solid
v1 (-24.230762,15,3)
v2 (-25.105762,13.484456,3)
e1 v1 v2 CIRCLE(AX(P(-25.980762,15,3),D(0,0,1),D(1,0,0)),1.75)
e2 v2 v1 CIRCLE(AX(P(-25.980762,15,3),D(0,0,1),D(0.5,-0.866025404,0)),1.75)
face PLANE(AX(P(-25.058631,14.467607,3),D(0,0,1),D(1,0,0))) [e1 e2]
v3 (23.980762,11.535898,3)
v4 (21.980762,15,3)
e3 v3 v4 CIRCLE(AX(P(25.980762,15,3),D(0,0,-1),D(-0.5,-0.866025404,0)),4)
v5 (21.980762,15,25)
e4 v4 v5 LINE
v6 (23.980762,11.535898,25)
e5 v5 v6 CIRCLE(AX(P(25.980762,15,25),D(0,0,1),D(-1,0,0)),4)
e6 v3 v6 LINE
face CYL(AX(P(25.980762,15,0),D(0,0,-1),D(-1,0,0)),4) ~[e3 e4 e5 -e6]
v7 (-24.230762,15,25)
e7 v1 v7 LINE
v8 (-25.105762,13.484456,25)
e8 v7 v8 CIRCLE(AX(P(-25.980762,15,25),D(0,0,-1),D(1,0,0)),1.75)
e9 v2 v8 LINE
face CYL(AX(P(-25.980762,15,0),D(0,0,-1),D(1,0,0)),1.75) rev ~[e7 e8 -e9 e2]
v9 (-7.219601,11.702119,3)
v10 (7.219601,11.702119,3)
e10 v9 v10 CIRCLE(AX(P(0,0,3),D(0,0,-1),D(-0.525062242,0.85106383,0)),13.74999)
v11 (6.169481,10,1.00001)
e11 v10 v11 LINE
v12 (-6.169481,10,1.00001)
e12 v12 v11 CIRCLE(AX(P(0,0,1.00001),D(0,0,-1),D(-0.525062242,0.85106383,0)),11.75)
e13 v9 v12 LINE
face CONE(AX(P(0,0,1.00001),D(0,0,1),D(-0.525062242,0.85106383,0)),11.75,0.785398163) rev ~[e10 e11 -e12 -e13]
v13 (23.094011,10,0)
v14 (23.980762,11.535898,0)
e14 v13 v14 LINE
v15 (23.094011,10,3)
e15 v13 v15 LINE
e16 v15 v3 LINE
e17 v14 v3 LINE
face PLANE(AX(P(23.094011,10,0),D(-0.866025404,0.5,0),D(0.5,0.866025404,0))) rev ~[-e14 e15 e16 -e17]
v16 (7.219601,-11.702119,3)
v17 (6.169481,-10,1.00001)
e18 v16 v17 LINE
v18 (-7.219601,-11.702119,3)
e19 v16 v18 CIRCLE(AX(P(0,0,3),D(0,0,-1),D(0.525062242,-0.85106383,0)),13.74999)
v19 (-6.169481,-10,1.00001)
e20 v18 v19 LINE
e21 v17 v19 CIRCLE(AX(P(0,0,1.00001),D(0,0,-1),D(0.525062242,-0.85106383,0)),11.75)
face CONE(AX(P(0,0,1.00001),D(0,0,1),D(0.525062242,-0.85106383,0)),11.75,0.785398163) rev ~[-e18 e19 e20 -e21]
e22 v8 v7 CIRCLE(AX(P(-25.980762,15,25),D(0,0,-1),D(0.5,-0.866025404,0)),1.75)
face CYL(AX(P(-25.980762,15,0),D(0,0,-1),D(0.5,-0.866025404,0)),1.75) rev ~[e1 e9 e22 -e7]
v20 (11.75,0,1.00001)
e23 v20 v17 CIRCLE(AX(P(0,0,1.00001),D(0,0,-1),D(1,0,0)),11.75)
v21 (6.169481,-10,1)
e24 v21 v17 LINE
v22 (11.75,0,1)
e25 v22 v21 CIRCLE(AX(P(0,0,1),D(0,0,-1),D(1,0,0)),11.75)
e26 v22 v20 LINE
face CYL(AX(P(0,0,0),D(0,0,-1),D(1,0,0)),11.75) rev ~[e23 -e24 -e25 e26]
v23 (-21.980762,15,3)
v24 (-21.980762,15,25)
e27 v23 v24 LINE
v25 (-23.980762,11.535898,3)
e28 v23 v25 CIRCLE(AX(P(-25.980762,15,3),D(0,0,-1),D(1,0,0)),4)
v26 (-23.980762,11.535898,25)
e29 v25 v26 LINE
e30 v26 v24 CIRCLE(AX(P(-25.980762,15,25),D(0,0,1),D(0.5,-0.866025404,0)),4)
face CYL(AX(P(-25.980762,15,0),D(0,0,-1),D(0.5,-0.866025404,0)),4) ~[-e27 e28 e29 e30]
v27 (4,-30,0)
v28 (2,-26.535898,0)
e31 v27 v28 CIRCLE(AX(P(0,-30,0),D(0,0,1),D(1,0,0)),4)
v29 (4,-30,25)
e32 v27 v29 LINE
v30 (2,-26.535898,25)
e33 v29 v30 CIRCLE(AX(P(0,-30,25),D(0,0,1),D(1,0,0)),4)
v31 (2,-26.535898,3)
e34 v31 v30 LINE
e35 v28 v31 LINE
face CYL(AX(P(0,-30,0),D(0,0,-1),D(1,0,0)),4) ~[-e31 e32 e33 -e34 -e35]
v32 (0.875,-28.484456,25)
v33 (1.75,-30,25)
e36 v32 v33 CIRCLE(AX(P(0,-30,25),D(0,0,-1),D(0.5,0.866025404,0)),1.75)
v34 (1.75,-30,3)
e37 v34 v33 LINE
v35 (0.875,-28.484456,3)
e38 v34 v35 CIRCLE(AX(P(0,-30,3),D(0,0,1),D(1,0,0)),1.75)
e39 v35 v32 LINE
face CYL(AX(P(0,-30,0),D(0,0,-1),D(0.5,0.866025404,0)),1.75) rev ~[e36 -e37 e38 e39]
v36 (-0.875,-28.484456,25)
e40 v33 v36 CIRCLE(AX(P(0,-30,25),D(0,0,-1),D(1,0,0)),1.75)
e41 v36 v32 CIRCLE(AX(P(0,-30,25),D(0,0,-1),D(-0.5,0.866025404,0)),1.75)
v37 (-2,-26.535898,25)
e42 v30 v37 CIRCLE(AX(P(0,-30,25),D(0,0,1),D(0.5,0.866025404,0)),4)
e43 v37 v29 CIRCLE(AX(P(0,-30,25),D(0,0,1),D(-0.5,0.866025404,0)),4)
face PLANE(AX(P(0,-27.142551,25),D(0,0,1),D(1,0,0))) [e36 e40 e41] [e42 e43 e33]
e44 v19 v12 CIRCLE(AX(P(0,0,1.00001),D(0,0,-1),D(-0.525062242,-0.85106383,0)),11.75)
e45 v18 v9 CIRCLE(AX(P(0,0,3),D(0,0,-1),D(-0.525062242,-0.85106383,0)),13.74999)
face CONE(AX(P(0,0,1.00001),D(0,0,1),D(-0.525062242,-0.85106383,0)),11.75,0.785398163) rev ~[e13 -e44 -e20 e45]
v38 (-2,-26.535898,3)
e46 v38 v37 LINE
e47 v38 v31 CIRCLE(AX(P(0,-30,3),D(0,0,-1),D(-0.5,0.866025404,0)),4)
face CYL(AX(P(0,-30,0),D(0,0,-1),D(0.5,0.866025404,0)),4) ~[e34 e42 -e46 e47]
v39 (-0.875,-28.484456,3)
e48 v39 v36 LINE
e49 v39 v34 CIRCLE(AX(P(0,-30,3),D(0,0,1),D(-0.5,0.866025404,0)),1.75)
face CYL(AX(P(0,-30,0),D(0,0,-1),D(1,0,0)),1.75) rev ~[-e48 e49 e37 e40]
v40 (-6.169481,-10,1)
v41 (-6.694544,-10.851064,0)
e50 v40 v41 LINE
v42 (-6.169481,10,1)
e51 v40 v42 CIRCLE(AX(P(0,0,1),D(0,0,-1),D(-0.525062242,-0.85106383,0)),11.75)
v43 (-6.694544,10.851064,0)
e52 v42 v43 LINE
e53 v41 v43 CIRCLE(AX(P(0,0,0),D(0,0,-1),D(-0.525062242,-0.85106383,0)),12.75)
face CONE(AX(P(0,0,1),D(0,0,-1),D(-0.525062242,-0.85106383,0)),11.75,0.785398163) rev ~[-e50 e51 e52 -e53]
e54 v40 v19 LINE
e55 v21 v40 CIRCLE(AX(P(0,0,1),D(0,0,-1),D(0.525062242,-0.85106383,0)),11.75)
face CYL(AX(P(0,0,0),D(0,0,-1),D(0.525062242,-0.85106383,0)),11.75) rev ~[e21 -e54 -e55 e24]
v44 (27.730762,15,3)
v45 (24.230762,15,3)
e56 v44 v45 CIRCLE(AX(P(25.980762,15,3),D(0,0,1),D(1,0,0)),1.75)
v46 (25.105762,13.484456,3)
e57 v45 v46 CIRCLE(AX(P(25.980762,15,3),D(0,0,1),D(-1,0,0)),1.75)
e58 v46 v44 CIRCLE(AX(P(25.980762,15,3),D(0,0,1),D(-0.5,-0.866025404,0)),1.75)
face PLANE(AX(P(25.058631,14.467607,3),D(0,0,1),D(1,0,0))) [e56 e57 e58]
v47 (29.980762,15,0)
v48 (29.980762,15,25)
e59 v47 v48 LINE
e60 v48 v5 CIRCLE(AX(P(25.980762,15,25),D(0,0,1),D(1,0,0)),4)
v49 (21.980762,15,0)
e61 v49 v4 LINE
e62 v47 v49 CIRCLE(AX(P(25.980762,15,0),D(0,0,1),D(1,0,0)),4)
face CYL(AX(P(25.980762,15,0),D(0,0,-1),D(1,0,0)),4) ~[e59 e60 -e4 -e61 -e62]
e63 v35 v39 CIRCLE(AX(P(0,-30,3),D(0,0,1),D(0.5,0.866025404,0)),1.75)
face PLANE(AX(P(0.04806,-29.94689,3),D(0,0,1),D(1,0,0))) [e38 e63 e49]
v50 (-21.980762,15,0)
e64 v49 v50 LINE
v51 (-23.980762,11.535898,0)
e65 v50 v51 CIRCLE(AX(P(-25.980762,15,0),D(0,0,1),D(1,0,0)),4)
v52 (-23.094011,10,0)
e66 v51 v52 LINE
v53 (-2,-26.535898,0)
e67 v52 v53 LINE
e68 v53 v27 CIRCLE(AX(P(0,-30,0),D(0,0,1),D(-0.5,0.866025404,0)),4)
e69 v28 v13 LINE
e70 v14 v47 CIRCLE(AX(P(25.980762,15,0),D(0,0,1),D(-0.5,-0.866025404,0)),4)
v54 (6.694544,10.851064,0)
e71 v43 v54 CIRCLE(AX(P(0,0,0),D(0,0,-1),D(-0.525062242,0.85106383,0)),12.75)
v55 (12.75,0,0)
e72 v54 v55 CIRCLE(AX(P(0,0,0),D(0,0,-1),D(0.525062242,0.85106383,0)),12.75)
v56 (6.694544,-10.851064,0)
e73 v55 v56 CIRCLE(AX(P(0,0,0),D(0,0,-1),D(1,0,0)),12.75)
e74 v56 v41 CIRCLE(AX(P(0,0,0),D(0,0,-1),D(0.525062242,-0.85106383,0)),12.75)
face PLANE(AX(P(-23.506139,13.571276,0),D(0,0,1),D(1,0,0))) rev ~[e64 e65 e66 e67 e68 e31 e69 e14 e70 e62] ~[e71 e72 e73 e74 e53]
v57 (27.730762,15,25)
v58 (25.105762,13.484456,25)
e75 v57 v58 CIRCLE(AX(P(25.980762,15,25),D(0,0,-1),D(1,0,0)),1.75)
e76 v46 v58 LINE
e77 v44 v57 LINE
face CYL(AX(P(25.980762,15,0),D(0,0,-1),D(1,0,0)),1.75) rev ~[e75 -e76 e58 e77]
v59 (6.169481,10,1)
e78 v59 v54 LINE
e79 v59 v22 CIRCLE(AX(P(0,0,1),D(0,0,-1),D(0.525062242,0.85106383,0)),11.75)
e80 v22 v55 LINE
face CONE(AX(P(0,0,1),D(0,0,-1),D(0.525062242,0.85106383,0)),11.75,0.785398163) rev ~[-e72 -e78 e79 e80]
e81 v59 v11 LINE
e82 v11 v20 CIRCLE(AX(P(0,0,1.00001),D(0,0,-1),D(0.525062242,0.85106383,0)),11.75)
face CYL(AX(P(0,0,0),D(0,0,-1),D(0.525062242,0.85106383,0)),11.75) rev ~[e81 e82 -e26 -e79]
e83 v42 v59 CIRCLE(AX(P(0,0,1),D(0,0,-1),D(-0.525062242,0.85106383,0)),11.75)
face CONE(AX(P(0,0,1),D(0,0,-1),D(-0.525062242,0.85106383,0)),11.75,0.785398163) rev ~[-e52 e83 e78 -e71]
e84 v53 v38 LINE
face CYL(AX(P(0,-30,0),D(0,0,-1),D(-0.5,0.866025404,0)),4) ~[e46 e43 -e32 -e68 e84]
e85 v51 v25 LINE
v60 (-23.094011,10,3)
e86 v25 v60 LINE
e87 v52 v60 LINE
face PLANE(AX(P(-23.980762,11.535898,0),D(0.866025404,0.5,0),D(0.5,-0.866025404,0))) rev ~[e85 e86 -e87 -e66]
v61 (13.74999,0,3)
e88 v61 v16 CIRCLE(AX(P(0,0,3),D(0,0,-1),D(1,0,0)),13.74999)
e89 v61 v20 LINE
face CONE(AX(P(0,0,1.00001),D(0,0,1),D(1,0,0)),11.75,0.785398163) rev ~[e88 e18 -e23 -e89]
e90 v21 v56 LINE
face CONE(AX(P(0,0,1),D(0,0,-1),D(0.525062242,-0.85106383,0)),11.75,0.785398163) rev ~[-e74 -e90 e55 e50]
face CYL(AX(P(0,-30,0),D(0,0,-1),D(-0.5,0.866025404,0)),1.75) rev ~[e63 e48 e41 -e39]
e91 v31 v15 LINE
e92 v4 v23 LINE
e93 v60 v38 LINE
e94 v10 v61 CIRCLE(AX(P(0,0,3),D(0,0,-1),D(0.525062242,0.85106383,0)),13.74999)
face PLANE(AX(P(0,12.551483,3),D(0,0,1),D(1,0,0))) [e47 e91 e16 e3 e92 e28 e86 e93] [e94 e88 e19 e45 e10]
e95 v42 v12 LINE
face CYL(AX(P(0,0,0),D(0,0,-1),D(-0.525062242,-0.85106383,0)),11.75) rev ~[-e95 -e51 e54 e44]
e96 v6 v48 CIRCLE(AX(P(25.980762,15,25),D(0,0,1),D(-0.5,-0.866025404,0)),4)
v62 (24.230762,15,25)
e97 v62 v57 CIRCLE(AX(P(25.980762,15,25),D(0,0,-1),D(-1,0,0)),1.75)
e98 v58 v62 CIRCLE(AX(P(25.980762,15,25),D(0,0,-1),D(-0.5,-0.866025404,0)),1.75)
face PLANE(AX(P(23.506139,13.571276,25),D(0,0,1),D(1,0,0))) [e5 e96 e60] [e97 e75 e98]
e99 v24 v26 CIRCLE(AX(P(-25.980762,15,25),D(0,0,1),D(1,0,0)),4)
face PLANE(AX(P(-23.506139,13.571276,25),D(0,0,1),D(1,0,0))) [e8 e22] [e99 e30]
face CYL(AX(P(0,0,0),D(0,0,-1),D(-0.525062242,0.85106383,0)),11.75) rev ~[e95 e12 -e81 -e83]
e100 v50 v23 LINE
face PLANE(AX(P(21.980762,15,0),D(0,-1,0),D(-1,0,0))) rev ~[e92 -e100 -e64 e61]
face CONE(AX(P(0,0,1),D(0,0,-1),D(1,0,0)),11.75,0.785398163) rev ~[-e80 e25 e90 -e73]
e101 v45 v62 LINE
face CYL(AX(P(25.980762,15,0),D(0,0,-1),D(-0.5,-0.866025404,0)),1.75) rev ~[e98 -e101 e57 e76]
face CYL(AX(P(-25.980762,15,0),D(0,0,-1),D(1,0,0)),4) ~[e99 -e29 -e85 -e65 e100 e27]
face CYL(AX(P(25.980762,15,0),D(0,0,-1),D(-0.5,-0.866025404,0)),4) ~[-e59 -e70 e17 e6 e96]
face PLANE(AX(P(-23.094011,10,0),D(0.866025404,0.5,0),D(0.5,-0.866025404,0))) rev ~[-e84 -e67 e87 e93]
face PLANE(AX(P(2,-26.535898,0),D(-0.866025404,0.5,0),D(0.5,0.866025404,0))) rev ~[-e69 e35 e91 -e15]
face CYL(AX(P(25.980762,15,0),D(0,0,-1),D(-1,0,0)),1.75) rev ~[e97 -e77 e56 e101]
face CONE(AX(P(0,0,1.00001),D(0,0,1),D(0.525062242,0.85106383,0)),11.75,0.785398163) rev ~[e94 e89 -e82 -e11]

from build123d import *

# Parameters (mm, degrees)
F1_DEPTH = 3
F2_DEPTH = 25
F3_SIZE  = 1
F4_SIZE  = 1.99999


# Not quite as in the source:
# - a fillet or chamfer is up to 0.001 mm smaller than in the source, because OpenCascade refuses the exact size


with BuildPart() as f1:
    # F0 (on Top) → F1 (new body)
    with BuildSketch(Plane.XY):
        with BuildLine():
            ThreePointArc((-6.1694813396, 10), (0, 11.75), (6.1694813396, 10))
            Line((6.1694813396, 10), (23.0940107676, 10))
            Line((23.0940107676, 10), (23.9807621135, 11.5358983849))
            ThreePointArc((23.9807621135, 11.5358983849), (22.5166604984, 13), (21.9807621135, 15))
            Line((21.9807621135, 15), (-21.9807621135, 15))
            ThreePointArc((-21.9807621135, 15), (-22.5166604984, 13), (-23.9807621135, 11.5358983849))
            Line((-23.9807621135, 11.5358983849), (-23.0940107676, 10))
            Line((-23.0940107676, 10), (-6.1694813396, 10))
        make_face()
        with BuildLine():
            ThreePointArc((-6.1694813396, -10), (-11.75, 0), (-6.1694813396, 10))
            Line((-6.1694813396, 10), (-23.0940107676, 10))
            Line((-23.0940107676, 10), (-11.5470053838, -10))
            Line((-11.5470053838, -10), (-6.1694813396, -10))
        make_face()
        with BuildLine():
            Line((11.5470053838, -10), (6.1694813396, -10))
            ThreePointArc((6.1694813396, -10), (0, -11.75), (-6.1694813396, -10))
            Line((-6.1694813396, -10), (-11.5470053838, -10))
            Line((-11.5470053838, -10), (-2, -26.5358983849))
            ThreePointArc((-2, -26.5358983849), (0, -26), (2, -26.5358983849))
            Line((2, -26.5358983849), (11.5470053838, -10))
        make_face()
        with BuildLine():
            ThreePointArc((6.1694813396, 10), (10.2604557828, 5.725866496), (11.75, 0))
            ThreePointArc((11.75, 0), (10.2604557828, -5.725866496), (6.1694813396, -10))
            Line((6.1694813396, -10), (11.5470053838, -10))
            Line((11.5470053838, -10), (23.0940107676, 10))
            Line((23.0940107676, 10), (6.1694813396, 10))
        make_face()
    extrude(amount=F1_DEPTH)



with BuildPart() as f1b:
    # F0 (on Top) → F1, piece 2 (new body)
    with BuildSketch(Plane.XY):
        with BuildLine():
            ThreePointArc((1.75, -30), (1.5155444566, -29.125), (0.875, -28.4844555434))
            Line((0.875, -28.4844555434), (0, -30))
            Line((0, -30), (-0.875, -28.4844555434))
            ThreePointArc((-0.875, -28.4844555434), (-0.875, -31.5155444566), (1.75, -30))
        make_face()
        with BuildLine():
            Line((0, -30), (0.875, -28.4844555434))
            ThreePointArc((0.875, -28.4844555434), (0, -28.25), (-0.875, -28.4844555434))
            Line((-0.875, -28.4844555434), (0, -30))
        make_face()
    extrude(amount=F1_DEPTH)


with BuildPart() as f1c:
    # F0 (on Top) → F1, piece 3 (new body)
    with BuildSketch(Plane.XY):
        with BuildLine():
            ThreePointArc((24.2307621135, 15), (24.4652176569, 14.125), (25.1057621135, 13.4844555434))
            Line((25.1057621135, 13.4844555434), (25.9807621135, 15))
            Line((25.9807621135, 15), (24.2307621135, 15))
        make_face()
        with BuildLine():
            Line((25.9807621135, 15), (25.1057621135, 13.4844555434))
            ThreePointArc((25.1057621135, 13.4844555434), (26.8557621135, 13.4844555434), (27.7307621135, 15))
            ThreePointArc((27.7307621135, 15), (25.9807621135, 16.75), (24.2307621135, 15))
            Line((24.2307621135, 15), (25.9807621135, 15))
        make_face()
    extrude(amount=F1_DEPTH)


with BuildPart() as f1d:
    # F0 (on Top) → F1, piece 4 (new body)
    with BuildSketch(Plane.XY):
        with BuildLine():
            Line((-25.9807621135, 15), (-25.1057621135, 13.4844555434))
            ThreePointArc((-25.1057621135, 13.4844555434), (-24.4652176569, 14.125), (-24.2307621135, 15))
            Line((-24.2307621135, 15), (-25.9807621135, 15))
        make_face()
        with BuildLine():
            ThreePointArc((-24.2307621135, 15), (-27.4963065702, 15.875), (-25.1057621135, 13.4844555434))
            Line((-25.1057621135, 13.4844555434), (-25.9807621135, 15))
            Line((-25.9807621135, 15), (-24.2307621135, 15))
        make_face()
    extrude(amount=F1_DEPTH)


with BuildPart() as f1_1:
    add(f1.part)

    add(f1b.part)  # F2 merges F1b

    add(f1c.part)  # F2 merges F1c

    add(f1d.part)  # F2 merges F1d
    # F0 (on Top) → F2 (join)
    with BuildSketch(Plane.XY):
        with BuildLine():
            Line((-25.1057621135, 13.4844555434), (-23.9807621135, 11.5358983849))
            ThreePointArc((-23.9807621135, 11.5358983849), (-22.5166604984, 13), (-21.9807621135, 15))
            Line((-21.9807621135, 15), (-24.2307621135, 15))
            ThreePointArc((-24.2307621135, 15), (-24.4652176569, 14.125), (-25.1057621135, 13.4844555434))
        make_face()
        with BuildLine():
            ThreePointArc((-21.9807621135, 15), (-29.4448637287, 17), (-23.9807621135, 11.5358983849))
            Line((-23.9807621135, 11.5358983849), (-25.1057621135, 13.4844555434))
            ThreePointArc((-25.1057621135, 13.4844555434), (-27.4963065702, 15.875), (-24.2307621135, 15))
            Line((-24.2307621135, 15), (-21.9807621135, 15))
        make_face()
        with BuildLine():
            ThreePointArc((21.9807621135, 15), (22.5166604984, 13), (23.9807621135, 11.5358983849))
            Line((23.9807621135, 11.5358983849), (25.1057621135, 13.4844555434))
            ThreePointArc((25.1057621135, 13.4844555434), (24.4652176569, 14.125), (24.2307621135, 15))
            Line((24.2307621135, 15), (21.9807621135, 15))
        make_face()
        with BuildLine():
            Line((25.1057621135, 13.4844555434), (23.9807621135, 11.5358983849))
            ThreePointArc((23.9807621135, 11.5358983849), (27.9807621135, 11.5358983849), (29.9807621135, 15))
            ThreePointArc((29.9807621135, 15), (25.9807621135, 19), (21.9807621135, 15))
            Line((21.9807621135, 15), (24.2307621135, 15))
            ThreePointArc((24.2307621135, 15), (25.9807621135, 16.75), (27.7307621135, 15))
            ThreePointArc((27.7307621135, 15), (26.8557621135, 13.4844555434), (25.1057621135, 13.4844555434))
        make_face()
        with BuildLine():
            Line((0.875, -28.4844555434), (2, -26.5358983849))
            ThreePointArc((2, -26.5358983849), (0, -26), (-2, -26.5358983849))
            Line((-2, -26.5358983849), (-0.875, -28.4844555434))
            ThreePointArc((-0.875, -28.4844555434), (0, -28.25), (0.875, -28.4844555434))
        make_face()
        with BuildLine():
            ThreePointArc((4, -30), (3.4641016151, -28), (2, -26.5358983849))
            Line((2, -26.5358983849), (0.875, -28.4844555434))
            ThreePointArc((0.875, -28.4844555434), (1.5155444566, -29.125), (1.75, -30))
            ThreePointArc((1.75, -30), (-0.875, -31.5155444566), (-0.875, -28.4844555434))
            Line((-0.875, -28.4844555434), (-2, -26.5358983849))
            ThreePointArc((-2, -26.5358983849), (-2, -33.4641016151), (4, -30))
        make_face()
    extrude(amount=F2_DEPTH)

    # F3
    f3_edges = [f1_1.edges().sort_by_distance(p)[0] for p in [
        (-6.169481, -10, 0),
    ]]
    chamfer(f3_edges, length=F3_SIZE)

    # F4 (size 2 in the source; OpenCascade refuses exactly that, so slightly less here)
    f4_edges = [f1_1.edges().sort_by_distance(p)[0] for p in [
        (-6.169481, -10, 3),
    ]]
    chamfer(f4_edges, length=F4_SIZE)


solid = f1_1.part
